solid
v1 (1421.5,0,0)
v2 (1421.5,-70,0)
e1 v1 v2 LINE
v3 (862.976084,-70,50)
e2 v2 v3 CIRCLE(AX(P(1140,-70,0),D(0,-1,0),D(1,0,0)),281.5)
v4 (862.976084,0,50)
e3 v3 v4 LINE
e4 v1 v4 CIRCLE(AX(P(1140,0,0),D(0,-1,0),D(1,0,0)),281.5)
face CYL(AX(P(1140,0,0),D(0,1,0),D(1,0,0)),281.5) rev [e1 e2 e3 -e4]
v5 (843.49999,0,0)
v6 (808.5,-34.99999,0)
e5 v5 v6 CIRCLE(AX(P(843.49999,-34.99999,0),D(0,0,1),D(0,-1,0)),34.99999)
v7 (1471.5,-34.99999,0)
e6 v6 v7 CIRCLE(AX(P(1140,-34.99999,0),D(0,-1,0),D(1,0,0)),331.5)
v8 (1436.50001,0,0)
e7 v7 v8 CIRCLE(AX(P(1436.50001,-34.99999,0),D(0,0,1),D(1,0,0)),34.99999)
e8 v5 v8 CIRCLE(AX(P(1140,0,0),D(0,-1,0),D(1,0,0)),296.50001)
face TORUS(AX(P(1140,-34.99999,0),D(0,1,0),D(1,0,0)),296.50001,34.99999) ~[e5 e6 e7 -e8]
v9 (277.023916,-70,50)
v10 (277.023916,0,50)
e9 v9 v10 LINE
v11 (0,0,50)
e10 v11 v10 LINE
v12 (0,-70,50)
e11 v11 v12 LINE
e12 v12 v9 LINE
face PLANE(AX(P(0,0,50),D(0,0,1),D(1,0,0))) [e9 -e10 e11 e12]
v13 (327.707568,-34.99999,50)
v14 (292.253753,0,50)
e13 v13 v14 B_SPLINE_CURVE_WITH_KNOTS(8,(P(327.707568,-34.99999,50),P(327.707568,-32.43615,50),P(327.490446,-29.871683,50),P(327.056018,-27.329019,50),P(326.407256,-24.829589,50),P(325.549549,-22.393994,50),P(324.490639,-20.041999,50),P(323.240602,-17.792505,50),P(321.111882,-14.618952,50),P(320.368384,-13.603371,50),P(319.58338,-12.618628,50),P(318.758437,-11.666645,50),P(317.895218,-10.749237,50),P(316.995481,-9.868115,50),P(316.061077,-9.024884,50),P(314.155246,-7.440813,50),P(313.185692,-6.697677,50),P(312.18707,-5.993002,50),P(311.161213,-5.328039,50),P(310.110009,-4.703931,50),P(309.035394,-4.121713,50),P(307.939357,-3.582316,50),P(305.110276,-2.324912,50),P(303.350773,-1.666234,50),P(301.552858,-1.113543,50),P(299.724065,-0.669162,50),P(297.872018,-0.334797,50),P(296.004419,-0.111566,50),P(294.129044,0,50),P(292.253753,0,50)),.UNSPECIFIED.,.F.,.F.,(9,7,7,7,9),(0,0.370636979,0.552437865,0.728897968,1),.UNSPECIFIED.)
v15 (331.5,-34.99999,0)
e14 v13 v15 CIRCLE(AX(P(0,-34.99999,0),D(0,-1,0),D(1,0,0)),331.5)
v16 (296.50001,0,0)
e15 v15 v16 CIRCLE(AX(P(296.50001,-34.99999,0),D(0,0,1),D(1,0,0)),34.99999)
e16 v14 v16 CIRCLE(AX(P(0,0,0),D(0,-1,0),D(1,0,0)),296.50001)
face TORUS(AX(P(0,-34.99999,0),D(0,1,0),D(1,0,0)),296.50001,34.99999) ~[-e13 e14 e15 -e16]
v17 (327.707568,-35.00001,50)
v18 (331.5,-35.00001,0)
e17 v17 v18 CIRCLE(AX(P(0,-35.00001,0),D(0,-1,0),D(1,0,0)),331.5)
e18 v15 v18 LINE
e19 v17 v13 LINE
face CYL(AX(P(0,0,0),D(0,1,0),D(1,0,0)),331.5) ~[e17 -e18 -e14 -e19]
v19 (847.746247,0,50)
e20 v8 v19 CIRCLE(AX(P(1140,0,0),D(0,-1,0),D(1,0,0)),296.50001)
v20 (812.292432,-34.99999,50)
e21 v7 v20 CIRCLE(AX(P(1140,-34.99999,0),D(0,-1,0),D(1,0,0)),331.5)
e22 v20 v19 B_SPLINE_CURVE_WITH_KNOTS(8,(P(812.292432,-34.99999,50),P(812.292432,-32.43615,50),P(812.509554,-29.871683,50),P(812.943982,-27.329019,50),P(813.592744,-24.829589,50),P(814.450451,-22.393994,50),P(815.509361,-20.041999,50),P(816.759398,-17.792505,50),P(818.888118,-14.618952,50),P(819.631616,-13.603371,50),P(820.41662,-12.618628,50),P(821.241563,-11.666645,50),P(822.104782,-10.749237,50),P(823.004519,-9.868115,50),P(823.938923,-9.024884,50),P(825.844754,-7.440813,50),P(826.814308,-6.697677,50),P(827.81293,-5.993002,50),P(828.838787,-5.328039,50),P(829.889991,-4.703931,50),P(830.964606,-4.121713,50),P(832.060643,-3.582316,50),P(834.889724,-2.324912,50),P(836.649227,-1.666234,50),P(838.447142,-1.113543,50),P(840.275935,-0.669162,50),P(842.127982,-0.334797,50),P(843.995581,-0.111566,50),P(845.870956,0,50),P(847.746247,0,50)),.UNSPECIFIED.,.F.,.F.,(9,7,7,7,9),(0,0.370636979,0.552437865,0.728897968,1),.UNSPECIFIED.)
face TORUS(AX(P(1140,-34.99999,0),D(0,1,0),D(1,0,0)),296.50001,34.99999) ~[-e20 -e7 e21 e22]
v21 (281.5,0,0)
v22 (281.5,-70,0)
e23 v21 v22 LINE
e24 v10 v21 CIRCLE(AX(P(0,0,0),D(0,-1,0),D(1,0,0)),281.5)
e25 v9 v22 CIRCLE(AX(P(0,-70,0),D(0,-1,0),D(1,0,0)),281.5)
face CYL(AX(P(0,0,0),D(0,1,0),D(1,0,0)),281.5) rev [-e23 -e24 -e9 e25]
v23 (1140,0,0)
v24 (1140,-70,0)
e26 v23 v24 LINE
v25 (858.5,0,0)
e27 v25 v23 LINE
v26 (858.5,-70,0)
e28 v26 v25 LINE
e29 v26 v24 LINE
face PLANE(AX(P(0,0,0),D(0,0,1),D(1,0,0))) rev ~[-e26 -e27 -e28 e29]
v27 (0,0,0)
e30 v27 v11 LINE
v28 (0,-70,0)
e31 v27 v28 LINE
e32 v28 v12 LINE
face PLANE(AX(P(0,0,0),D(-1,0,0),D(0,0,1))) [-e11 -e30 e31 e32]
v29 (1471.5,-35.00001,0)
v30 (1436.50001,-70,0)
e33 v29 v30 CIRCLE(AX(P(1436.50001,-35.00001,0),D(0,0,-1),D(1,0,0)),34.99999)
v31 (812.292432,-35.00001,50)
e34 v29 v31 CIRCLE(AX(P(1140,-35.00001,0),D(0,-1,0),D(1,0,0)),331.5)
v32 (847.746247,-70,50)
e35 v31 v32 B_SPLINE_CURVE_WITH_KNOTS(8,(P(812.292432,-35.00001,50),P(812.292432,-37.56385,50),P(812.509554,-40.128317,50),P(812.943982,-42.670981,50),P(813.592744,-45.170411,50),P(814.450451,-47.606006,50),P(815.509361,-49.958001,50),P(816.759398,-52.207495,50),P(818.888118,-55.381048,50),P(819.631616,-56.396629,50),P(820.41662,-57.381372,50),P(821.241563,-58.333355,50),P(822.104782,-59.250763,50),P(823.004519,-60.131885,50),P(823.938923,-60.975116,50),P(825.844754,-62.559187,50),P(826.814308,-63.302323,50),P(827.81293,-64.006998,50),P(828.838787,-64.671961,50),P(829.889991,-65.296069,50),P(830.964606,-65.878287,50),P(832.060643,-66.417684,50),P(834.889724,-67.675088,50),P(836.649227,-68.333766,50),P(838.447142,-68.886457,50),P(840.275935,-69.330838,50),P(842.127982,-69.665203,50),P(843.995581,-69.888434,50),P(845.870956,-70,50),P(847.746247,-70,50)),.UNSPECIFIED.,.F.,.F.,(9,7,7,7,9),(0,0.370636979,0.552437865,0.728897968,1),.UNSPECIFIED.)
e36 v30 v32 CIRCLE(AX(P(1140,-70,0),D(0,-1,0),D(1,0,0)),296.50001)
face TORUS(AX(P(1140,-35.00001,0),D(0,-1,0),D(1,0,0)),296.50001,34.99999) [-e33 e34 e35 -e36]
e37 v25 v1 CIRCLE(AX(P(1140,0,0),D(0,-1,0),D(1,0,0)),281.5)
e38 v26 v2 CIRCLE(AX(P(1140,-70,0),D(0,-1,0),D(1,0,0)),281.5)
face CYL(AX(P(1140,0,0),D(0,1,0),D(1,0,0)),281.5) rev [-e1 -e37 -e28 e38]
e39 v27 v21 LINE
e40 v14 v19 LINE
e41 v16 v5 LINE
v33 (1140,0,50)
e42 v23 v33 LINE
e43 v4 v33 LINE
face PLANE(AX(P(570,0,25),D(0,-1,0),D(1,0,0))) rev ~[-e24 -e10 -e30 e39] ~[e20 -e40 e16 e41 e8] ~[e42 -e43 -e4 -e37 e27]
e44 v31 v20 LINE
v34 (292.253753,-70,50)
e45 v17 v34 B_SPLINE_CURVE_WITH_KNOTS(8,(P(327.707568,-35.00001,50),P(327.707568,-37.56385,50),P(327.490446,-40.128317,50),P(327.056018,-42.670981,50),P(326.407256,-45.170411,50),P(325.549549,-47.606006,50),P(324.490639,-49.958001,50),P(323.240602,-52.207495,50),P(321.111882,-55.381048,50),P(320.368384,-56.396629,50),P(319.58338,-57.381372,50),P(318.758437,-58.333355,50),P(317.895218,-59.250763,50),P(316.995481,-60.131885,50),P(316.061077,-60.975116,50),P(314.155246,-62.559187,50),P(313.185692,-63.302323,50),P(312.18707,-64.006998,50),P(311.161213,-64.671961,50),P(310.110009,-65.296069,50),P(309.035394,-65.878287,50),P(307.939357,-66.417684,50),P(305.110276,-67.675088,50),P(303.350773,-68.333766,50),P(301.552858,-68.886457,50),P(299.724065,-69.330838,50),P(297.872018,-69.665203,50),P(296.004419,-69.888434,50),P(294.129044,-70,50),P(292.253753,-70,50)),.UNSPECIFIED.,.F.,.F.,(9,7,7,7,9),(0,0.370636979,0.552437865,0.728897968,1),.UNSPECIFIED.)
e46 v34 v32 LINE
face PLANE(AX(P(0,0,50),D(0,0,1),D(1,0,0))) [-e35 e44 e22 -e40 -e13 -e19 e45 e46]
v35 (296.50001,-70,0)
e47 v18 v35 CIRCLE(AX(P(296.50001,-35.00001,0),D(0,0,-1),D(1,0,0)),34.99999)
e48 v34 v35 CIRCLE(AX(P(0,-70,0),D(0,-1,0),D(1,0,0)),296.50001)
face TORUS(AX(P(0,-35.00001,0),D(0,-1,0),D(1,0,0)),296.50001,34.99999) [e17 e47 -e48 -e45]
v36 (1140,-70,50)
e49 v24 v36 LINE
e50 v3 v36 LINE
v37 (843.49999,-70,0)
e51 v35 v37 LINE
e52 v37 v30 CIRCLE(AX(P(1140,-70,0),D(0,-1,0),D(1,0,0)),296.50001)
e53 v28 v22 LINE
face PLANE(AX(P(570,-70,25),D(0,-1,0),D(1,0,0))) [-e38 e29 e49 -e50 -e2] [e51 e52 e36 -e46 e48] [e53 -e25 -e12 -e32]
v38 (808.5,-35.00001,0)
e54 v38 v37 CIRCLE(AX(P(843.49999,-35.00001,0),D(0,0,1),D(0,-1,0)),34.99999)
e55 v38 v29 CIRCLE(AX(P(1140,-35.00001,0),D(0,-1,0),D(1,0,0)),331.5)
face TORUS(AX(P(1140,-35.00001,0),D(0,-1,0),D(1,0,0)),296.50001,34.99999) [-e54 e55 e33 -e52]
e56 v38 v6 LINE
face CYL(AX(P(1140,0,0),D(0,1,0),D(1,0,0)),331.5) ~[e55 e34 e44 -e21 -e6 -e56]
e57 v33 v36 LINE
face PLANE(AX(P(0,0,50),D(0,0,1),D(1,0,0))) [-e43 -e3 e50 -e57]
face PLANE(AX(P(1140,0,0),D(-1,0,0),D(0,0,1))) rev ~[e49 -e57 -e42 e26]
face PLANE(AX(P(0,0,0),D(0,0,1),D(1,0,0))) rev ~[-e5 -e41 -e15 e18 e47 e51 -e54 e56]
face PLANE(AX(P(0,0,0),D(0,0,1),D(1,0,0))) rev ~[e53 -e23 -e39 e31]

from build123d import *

# Parameters (mm, degrees)
F0_R     = 331.5
F0_R_2   = 281.5
F1_DEPTH = 70
F2_R     = 34.99999
F4_W     = 1140
F4_H     = 50
F5_DEPTH = 70


# Not quite as in the source:
# - a fillet or chamfer is up to 0.001 mm smaller than in the source, because OpenCascade refuses the exact size


with BuildPart() as f1:
    # F0 (on Front) → F1 (new body)
    with BuildSketch(Plane.XZ):
        Circle(F0_R)
        Circle(F0_R_2, mode=Mode.SUBTRACT)
    extrude(amount=F1_DEPTH)

    # F2 (radius 35 in the source; OpenCascade refuses exactly that, so slightly less here)
    f2_edges = [f1.edges().sort_by_distance(p)[0] for p in [
        (-331.5, -70, 0),
        (-331.5, 0, 0),
    ]]
    fillet(f2_edges, radius=F2_R)


with BuildPart() as f3_1:
    # F3: copy of F1
    add(f1.part.moved(Location((1140, 0, 0))))


with BuildPart() as f1_1:
    add(f1.part)

    add(f3_1.part)  # F5 merges F3_1
    # F4 (on Front) → F5 (join)
    with BuildSketch(Plane.XZ):
        with Locations((570, 25)):
            Rectangle(F4_W, F4_H)
    extrude(amount=F5_DEPTH)


solid = f1_1.part
